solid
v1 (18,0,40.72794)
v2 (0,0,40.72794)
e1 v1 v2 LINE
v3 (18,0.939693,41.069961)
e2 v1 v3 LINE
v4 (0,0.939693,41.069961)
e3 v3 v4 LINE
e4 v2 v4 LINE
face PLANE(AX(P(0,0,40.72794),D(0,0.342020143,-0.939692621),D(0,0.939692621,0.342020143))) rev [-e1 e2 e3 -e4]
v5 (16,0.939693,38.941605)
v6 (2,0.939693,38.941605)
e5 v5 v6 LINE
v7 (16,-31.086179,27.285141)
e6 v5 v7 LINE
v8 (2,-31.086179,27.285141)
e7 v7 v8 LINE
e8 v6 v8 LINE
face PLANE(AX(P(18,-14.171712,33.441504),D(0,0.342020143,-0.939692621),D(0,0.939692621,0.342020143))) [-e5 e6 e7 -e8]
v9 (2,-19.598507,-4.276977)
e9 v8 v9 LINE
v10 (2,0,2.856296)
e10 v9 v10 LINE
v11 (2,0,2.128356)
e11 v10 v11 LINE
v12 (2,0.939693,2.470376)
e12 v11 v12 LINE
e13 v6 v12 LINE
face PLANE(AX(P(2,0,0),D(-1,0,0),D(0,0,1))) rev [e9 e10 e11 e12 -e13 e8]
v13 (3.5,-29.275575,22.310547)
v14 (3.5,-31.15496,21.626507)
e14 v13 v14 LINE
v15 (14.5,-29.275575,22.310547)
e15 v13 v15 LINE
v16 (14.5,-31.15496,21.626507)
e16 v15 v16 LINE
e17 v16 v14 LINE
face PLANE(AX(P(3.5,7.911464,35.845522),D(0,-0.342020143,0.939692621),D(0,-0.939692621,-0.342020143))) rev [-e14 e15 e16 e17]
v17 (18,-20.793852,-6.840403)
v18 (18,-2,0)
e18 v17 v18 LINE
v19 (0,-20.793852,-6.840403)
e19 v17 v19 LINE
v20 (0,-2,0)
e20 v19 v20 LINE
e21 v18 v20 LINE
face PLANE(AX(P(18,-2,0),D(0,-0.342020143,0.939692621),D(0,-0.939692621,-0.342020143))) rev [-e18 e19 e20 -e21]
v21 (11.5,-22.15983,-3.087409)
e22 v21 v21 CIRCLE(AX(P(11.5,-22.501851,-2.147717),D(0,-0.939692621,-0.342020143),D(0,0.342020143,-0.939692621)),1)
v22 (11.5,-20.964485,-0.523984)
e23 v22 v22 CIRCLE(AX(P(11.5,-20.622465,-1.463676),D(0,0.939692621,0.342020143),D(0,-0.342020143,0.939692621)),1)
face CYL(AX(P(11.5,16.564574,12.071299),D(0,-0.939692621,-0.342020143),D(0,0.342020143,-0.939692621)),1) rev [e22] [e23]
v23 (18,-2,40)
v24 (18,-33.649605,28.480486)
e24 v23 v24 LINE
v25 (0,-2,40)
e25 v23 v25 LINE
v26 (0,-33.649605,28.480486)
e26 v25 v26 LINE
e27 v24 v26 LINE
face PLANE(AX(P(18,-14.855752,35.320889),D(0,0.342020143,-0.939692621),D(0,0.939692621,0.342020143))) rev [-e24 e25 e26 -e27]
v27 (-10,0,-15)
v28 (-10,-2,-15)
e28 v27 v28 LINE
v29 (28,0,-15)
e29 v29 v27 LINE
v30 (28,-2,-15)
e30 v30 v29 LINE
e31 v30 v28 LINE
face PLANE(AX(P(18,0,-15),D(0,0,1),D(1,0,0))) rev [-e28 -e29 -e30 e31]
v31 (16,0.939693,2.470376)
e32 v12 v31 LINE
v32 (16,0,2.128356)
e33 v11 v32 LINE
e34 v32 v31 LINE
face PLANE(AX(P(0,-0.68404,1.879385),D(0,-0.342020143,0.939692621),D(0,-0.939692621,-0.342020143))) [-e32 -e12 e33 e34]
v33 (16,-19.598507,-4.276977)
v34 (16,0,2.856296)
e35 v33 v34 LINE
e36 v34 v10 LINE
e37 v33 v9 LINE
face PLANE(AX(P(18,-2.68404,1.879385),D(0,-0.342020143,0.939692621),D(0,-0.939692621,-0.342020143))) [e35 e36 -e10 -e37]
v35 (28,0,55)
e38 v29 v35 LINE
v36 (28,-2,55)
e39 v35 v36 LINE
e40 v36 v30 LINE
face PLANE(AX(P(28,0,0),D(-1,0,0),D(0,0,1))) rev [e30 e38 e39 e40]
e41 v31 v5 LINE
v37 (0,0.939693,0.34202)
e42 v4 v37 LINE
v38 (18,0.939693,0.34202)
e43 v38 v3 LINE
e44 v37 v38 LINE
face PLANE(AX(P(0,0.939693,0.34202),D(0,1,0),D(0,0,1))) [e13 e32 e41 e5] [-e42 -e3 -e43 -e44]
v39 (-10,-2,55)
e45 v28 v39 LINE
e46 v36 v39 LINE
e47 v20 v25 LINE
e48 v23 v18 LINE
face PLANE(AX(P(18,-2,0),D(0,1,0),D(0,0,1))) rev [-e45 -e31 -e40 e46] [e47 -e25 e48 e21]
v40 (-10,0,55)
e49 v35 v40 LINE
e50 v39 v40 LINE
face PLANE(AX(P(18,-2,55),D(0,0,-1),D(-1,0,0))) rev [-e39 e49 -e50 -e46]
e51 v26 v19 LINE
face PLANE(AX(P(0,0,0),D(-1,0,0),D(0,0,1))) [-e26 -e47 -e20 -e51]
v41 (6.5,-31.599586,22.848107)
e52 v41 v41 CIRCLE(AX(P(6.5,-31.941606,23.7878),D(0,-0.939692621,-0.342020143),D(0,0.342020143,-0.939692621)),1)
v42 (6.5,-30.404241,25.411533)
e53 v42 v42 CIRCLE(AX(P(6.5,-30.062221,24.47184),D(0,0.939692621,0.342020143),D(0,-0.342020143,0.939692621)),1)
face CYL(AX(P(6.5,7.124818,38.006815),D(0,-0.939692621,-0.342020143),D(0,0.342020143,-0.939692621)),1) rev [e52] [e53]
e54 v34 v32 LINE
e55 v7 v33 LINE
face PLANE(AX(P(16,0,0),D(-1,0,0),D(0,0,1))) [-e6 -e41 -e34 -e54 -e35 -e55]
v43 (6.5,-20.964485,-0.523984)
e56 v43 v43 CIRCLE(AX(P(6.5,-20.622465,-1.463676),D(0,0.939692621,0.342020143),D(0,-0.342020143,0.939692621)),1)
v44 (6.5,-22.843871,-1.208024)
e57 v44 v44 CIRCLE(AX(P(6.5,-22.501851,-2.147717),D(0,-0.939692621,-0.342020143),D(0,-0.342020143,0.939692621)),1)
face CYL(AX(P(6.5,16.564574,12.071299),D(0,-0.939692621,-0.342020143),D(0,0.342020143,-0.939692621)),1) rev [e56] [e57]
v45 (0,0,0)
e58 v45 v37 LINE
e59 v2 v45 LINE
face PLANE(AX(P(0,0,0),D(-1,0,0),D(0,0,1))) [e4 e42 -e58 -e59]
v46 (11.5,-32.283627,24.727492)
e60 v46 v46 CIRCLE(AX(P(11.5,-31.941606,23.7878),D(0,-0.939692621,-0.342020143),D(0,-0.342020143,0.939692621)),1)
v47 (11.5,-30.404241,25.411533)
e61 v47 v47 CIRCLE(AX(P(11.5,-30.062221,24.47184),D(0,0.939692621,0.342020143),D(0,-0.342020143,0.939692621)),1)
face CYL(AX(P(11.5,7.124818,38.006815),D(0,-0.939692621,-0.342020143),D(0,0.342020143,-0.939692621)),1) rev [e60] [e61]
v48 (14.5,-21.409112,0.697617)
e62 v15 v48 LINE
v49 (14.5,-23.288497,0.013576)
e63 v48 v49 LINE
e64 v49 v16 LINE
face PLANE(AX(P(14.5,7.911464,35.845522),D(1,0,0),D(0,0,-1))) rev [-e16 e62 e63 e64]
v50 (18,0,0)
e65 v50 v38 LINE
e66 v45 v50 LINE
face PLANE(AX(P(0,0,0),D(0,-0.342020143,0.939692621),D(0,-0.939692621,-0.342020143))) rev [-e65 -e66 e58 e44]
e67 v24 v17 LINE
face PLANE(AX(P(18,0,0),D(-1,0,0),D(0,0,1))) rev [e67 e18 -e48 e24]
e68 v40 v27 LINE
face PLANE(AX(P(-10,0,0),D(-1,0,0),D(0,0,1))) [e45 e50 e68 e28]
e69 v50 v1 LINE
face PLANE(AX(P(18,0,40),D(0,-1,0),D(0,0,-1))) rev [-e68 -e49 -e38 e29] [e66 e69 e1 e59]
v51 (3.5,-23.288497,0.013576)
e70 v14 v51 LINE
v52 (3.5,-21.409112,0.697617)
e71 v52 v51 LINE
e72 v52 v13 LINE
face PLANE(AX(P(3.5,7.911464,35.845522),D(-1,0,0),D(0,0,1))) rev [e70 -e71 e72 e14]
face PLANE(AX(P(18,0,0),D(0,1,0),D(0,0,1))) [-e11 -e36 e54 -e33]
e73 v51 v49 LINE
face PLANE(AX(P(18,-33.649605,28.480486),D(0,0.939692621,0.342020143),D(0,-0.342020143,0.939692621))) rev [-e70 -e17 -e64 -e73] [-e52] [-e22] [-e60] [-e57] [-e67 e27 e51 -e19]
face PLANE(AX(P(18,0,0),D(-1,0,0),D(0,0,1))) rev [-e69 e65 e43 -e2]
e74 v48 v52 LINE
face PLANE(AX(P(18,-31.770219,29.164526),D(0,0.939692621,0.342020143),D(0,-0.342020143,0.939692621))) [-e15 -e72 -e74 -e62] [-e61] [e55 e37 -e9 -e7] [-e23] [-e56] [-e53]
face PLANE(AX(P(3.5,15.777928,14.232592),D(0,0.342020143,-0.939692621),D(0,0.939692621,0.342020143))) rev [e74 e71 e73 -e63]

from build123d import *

# Parameters (mm, degrees)
BOSS_EXTRU_1_DEPTH      = 18
BOSS_EXTRU_4_DEPTH      = 1
COQUE7_START            = 2
COQUE7_DEPTH            = 14
ESQUISSE2_R             = 1
ESQUISSE2_W             = 11
ESQUISSE2_H             = 23
ENL_V_MAT_EXTRU_1_DEPTH = 69.486359517
ESQUISSE7_W             = 70
ESQUISSE7_H             = 2
BOSS_EXTRU_5_DEPTH      = 10
ESQUISSE8_W             = 70
ESQUISSE8_H             = 2
BOSS_EXTRU_6_DEPTH      = 10


# Read off the part's stored shape, not the designer's step: Coque7
with BuildPart() as part:
    # Esquisse1 → Boss.-Extru.1 (new body)
    with BuildSketch(Plane(origin=(0, 0, 0), x_dir=(0, 0, -1), z_dir=(1, 0, 0))):
        Polygon((-35.320888862, -14.855752194), (-40, -2), (-55, -2), (-55, 0), (-40, 0), (0, 0), (15, 0), (15, -2), (0, -2), (6.840402867, -20.793852416), (-28.480485996, -33.649604609), align=None)
    extrude(amount=BOSS_EXTRU_1_DEPTH)

    # Esquisse3D1 → Boss.-Extru.4 (add, along a direction that is not the sketch's normal)
    with BuildSketch(Plane(origin=(0, 0, 0), x_dir=(0.40423775033266973, 0, 0.9146539461490243), z_dir=(0, -1, 0))):
        Polygon((0, 0), (37.251971468, 16.463771031), (44.528250974, 0), (7.276279506, -16.463771031), align=None)
    extrude(amount=-BOSS_EXTRU_4_DEPTH, dir=(0, -0.9396926207859081, -0.3420201433256695))

    # Coque7 outline → Coque7 (cut)
    with BuildSketch(Plane.YZ.offset(COQUE7_START)):
        Polygon((0, 2.856296013), (0, 2.128355545), (0.939692621, 2.470375688), (0.939692621, 38.941605067), (-31.086179081, 27.285141041), (-19.598507461, -4.276977338), align=None)
    extrude(amount=COQUE7_DEPTH, mode=Mode.SUBTRACT)

    # Esquisse2 → Enlèv. mat.-Extru.1 (cut, through all)
    with BuildSketch(Plane(origin=(0, -20.559896859, -7.483190476), x_dir=(1, 0, 0), z_dir=(0, -0.9396926207859082, -0.34202014332566943))):
        with Locations(Location((6.5, 33.277892702, 0), (0, 0, 270))):
            Circle(ESQUISSE2_R)
        with Locations(Location((11.5, 33.277892702, 0), (0, 0, 90))):
            Circle(ESQUISSE2_R)
        with Locations(Location((11.5, 5.677892702, 0), (0, 0, 270))):
            Circle(ESQUISSE2_R)
        with Locations(Location((6.5, 5.677892702, 0), (0, 0, 90))):
            Circle(ESQUISSE2_R)
        with Locations((9, 19.477892702)):
            Rectangle(ESQUISSE2_W, ESQUISSE2_H)
    extrude(amount=-ENL_V_MAT_EXTRU_1_DEPTH, mode=Mode.SUBTRACT)

    # Esquisse7 → Boss.-Extru.5 (add)
    with BuildSketch(Plane.ZY):
        with Locations((20, -1)):
            Rectangle(ESQUISSE7_W, ESQUISSE7_H)
    extrude(amount=BOSS_EXTRU_5_DEPTH)

    # Esquisse8 → Boss.-Extru.6 (add)
    with BuildSketch(Plane(origin=(18, 0, 0), x_dir=(0, 0, -1), z_dir=(1, 0, 0))):
        with Locations((-20, -1)):
            Rectangle(ESQUISSE8_W, ESQUISSE8_H)
    extrude(amount=BOSS_EXTRU_6_DEPTH)


solid = part.part
